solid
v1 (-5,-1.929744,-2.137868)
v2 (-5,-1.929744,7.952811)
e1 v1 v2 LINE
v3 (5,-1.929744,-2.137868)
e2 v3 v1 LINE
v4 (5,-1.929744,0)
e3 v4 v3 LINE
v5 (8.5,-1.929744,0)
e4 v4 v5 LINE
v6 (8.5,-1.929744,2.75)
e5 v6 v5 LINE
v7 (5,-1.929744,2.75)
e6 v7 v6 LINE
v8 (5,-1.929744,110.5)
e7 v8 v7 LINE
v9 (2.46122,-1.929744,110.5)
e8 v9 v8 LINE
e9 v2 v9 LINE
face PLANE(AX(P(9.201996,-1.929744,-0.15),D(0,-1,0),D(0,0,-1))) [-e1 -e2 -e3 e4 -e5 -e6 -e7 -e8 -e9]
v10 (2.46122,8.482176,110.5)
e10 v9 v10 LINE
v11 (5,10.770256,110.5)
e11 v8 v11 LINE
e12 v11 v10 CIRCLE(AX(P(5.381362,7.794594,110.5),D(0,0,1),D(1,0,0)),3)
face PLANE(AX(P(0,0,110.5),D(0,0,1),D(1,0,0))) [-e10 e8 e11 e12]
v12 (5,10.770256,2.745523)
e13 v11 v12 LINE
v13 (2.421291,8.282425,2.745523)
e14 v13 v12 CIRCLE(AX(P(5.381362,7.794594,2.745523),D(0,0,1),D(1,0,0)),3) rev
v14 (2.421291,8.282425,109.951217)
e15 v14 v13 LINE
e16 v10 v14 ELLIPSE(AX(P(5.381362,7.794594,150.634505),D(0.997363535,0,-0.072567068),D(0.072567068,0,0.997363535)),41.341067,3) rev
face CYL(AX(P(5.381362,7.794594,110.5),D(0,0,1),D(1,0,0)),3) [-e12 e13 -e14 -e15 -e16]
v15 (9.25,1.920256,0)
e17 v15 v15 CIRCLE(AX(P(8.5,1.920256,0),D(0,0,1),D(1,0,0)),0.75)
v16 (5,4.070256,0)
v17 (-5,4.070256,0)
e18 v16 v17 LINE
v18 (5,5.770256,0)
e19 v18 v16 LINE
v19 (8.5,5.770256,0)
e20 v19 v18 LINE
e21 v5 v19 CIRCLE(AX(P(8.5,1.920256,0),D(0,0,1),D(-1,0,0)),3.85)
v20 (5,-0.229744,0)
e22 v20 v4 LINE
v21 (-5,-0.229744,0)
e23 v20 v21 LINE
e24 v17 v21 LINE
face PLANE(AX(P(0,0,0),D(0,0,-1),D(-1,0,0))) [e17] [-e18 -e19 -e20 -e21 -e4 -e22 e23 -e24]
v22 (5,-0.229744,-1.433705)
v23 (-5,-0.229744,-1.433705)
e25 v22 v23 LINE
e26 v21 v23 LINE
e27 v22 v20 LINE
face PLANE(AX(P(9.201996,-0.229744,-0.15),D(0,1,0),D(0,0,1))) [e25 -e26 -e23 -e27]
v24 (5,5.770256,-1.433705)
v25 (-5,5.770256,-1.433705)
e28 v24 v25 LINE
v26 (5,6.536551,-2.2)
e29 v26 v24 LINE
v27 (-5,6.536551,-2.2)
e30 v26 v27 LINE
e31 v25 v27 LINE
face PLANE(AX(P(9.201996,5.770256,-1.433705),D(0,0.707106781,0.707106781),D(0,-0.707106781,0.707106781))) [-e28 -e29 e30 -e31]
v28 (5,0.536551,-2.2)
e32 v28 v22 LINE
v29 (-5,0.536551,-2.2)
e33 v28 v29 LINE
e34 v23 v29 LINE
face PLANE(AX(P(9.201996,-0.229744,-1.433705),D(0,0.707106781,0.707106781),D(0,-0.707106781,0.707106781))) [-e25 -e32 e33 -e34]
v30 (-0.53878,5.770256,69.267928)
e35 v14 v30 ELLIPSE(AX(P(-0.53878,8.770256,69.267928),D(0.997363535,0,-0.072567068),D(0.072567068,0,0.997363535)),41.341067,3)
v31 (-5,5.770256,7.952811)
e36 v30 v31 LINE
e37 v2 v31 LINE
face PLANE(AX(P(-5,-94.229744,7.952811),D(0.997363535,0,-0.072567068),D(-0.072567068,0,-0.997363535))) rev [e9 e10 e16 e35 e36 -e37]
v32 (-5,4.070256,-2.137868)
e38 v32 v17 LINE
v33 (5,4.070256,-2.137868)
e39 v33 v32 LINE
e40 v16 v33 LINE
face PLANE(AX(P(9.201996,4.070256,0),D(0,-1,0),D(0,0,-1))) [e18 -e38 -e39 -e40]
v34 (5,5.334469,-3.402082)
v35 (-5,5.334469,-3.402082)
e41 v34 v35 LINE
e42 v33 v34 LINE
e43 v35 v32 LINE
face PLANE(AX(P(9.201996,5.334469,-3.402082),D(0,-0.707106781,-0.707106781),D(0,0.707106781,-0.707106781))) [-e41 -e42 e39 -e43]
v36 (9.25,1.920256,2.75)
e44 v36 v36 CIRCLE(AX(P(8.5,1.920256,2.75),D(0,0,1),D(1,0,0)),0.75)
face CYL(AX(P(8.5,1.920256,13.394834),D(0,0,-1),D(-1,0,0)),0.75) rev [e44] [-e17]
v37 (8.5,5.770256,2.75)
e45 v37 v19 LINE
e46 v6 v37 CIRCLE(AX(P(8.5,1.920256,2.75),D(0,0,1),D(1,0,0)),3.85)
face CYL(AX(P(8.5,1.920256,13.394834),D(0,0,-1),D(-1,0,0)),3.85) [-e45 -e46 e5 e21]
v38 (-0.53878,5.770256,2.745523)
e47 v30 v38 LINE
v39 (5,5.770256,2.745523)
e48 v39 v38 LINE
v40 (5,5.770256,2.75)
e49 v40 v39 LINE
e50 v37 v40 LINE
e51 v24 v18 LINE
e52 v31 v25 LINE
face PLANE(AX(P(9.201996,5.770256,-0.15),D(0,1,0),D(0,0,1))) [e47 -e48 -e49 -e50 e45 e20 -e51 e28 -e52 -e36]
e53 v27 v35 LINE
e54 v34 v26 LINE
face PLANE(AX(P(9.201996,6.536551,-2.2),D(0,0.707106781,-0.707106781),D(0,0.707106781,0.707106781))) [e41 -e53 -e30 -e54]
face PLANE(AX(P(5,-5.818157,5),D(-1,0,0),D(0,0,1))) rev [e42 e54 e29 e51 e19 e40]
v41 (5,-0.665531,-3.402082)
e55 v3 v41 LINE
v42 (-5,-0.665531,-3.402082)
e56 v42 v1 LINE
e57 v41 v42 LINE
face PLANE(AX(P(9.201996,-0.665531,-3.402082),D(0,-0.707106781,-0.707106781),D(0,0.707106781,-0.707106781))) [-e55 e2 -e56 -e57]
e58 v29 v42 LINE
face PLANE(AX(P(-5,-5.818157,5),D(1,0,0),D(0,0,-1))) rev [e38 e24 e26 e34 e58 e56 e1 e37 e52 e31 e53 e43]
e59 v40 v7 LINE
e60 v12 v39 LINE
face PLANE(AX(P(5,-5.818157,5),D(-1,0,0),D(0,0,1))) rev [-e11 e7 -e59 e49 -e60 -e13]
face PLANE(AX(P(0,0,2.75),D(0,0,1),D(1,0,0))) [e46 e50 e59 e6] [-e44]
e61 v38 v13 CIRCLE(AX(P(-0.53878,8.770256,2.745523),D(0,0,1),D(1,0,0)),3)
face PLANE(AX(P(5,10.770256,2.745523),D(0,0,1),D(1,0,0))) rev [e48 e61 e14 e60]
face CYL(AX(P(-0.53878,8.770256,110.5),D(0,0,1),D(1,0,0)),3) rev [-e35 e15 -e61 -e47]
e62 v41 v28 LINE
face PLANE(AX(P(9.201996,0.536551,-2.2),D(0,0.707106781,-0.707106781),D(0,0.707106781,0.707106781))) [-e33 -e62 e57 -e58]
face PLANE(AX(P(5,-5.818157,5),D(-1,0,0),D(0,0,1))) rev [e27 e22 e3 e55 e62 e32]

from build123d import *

# Parameters (mm, degrees)
SKETCH2_W            = 10
SKETCH2_H            = 14.768412439
BOSS_EXTRUDE1_DEPTH  = 5
BOSS_EXTRUDE4_DEPTH  = 10
SKETCH9_W            = 10
SKETCH9_H            = 3.18
SKETCH9_H_2          = 3.888412439
CUT_EXTRUDE3_DEPTH   = 5
BOSS_EXTRUDE5_DEPTH  = 7.7
SKETCH12_R           = 0.75
BOSS_EXTRUDE7_DEPTH  = 2.75
FILLET1_R            = 2.5
SKETCH13_W           = 17.887250462
SKETCH13_H           = 46.229219396
CUT_EXTRUDE4_DEPTH   = 20
SKETCH15_W           = 10
SKETCH15_H           = 7.7
BOSS_EXTRUDE9_DEPTH  = 100
CUT_EXTRUDE5_DEPTH   = 100
SKETCH17_W           = 2.538779858
SKETCH17_H           = 107.754476916
BOSS_EXTRUDE10_DEPTH = 5
FILLET2_R            = 3
FILLET3_R            = 3


with BuildPart() as part:
    # Sketch2 → Boss-Extrude1 (new body)
    with BuildSketch(Plane.XY):
        with Locations((0, 1.566049366)):
            Rectangle(SKETCH2_W, SKETCH2_H)
    extrude(amount=BOSS_EXTRUDE1_DEPTH)

    # Sketch8 → Boss-Extrude4 (add)
    with BuildSketch(Plane.ZY.offset(5)):
        Polygon((-0.15, 5.770255585), (0, 5.770255585), (0, 4.070255585), (-0.15, 4.070255585), (-2.137867966, 4.070255585), (-3.402081528, 5.334469147), (-2.2, 6.536550675), (-1.43370491, 5.770255585), align=None)
        Polygon((-0.15, -1.929744415), (0, -1.929744415), (0, -0.229744415), (-0.15, -0.229744415), (-1.43370491, -0.229744415), (-2.2, 0.536550675), (-3.402081528, -0.665530853), (-2.137867966, -1.929744415), align=None)
    extrude(amount=-BOSS_EXTRUDE4_DEPTH)

    # Sketch9 → Cut-Extrude3 (cut)
    with BuildSketch(Plane(origin=(0, 0, 0), x_dir=(-1, 0, 0), z_dir=(0, 0, -1))):
        with Locations((0, 7.360255585)):
            Rectangle(SKETCH9_W, SKETCH9_H)
        with Locations((0, -3.873950635)):
            Rectangle(SKETCH9_W, SKETCH9_H_2)
    extrude(amount=-CUT_EXTRUDE3_DEPTH, mode=Mode.SUBTRACT)

    # Sketch10 → Boss-Extrude5 (add)
    with BuildSketch(Plane(origin=(0, 5.770255585, 0), x_dir=(1, 0, 0), z_dir=(0, 1, 0))):
        with BuildLine():
            Line((-5, -5), (-5, -10.5))
            Line((-5, -10.5), (1.352445729, -55.7))
            Line((1.352445729, -55.7), (6.352445729, -55.7))
            Line((6.352445729, -55.7), (6.352445729, -49.2))
            ThreePointArc((6.352445729, -49.2), (1.383429579, -31.764936646), (5, -14))
            Line((5, -14), (5, -5))
            Line((5, -5), (-5, -5))
        make_face()
    extrude(amount=-BOSS_EXTRUDE5_DEPTH)

    # Sketch12 → Boss-Extrude7 (add)
    with BuildSketch(Plane.XY):
        with BuildLine():
            Line((5, 5.770255585), (8.5, 5.770255585))
            ThreePointArc((8.5, 5.770255585), (12.35, 1.920255585), (8.5, -1.929744415))
            Line((8.5, -1.929744415), (5, -1.929744415))
            Line((5, -1.929744415), (5, 5.770255585))
        make_face()
        with Locations((8.5, 1.920255585)):
            Circle(SKETCH12_R, mode=Mode.SUBTRACT)
    extrude(amount=BOSS_EXTRUDE7_DEPTH)

    # Fillet1
    fillet1_edges = [part.edges().sort_by_distance(p)[0] for p in [
        (6.352445729, 1.920255585, 49.2),
        (5, 1.920255585, 14),
        (1.352445729, 1.920255585, 55.7),
        (6.352445729, 1.920255585, 55.7),
    ]]
    fillet(fillet1_edges, radius=FILLET1_R)

    # Sketch13 → Cut-Extrude4 (cut)
    with BuildSketch(Plane(origin=(0, 5.770255585, 0), x_dir=(1, 0, 0), z_dir=(0, 1, 0))):
        with Locations((3.943625231, -33.614609698)):
            Rectangle(SKETCH13_W, SKETCH13_H)
    extrude(amount=-CUT_EXTRUDE4_DEPTH, mode=Mode.SUBTRACT)

    # Sketch15 → Boss-Extrude9 (add)
    with BuildSketch(Plane.XY.offset(10.5)):
        with Locations((0, 1.920255585)):
            Rectangle(SKETCH15_W, SKETCH15_H)
    extrude(amount=BOSS_EXTRUDE9_DEPTH)

    # Sketch16 → Cut-Extrude5 (cut)
    with BuildSketch(Plane(origin=(0, 5.770255585, 0), x_dir=(1, 0, 0), z_dir=(0, 1, 0))):
        Polygon((-5, -7.952810564), (2.461220142, -110.5), (-5, -110.5), align=None)
    extrude(amount=-CUT_EXTRUDE5_DEPTH, mode=Mode.SUBTRACT)

    # Sketch17 → Boss-Extrude10 (add)
    with BuildSketch(Plane(origin=(0, 5.770255585, 0), x_dir=(1, 0, 0), z_dir=(0, 1, 0))):
        with Locations((3.730610071, -56.622761542)):
            Rectangle(SKETCH17_W, SKETCH17_H)
    extrude(amount=BOSS_EXTRUDE10_DEPTH)

    # Fillet2
    fillet2_edges = [part.edges().sort_by_distance(p)[0] for p in [
        (2.461220142, 5.770255585, 56.622761542),
    ]]
    fillet(fillet2_edges, radius=FILLET2_R)

    # Fillet3
    # the kernel refuses this fillet: 3 mm, written as the material it takes off along each edge
    with BuildSketch(Plane(origin=(2.461220142, 10.770255585, 116.846949644), x_dir=(-0.016047608738208652, -0.9998712288358863, 0), z_dir=(0, 0, -1))) as fillet3_piece_1:
        with BuildLine():
            CenterArc((2.92841725, -2.967518469), FILLET3_R, 98.438939572, 73.338315122)
            Line((-0.040741346, -2.538452936), (-0.337657205, -2.495546383))
            ThreePointArc((-0.337657205, -2.495546383), (-0.320332042, -1.264412185), (-0.299961369, 0.004814283))
            Line((-0.299961369, 0.004814283), (0.004814283, 0.299961369))
            ThreePointArc((0.004814283, 0.299961369), (2.00455674, 0.267866151), (2.444124669, 0.296751847))
            Line((2.444124669, 0.296751847), (2.488151267, 0))
        make_face()
    extrude(amount=120.448376205, mode=Mode.SUBTRACT)


solid = part.part
